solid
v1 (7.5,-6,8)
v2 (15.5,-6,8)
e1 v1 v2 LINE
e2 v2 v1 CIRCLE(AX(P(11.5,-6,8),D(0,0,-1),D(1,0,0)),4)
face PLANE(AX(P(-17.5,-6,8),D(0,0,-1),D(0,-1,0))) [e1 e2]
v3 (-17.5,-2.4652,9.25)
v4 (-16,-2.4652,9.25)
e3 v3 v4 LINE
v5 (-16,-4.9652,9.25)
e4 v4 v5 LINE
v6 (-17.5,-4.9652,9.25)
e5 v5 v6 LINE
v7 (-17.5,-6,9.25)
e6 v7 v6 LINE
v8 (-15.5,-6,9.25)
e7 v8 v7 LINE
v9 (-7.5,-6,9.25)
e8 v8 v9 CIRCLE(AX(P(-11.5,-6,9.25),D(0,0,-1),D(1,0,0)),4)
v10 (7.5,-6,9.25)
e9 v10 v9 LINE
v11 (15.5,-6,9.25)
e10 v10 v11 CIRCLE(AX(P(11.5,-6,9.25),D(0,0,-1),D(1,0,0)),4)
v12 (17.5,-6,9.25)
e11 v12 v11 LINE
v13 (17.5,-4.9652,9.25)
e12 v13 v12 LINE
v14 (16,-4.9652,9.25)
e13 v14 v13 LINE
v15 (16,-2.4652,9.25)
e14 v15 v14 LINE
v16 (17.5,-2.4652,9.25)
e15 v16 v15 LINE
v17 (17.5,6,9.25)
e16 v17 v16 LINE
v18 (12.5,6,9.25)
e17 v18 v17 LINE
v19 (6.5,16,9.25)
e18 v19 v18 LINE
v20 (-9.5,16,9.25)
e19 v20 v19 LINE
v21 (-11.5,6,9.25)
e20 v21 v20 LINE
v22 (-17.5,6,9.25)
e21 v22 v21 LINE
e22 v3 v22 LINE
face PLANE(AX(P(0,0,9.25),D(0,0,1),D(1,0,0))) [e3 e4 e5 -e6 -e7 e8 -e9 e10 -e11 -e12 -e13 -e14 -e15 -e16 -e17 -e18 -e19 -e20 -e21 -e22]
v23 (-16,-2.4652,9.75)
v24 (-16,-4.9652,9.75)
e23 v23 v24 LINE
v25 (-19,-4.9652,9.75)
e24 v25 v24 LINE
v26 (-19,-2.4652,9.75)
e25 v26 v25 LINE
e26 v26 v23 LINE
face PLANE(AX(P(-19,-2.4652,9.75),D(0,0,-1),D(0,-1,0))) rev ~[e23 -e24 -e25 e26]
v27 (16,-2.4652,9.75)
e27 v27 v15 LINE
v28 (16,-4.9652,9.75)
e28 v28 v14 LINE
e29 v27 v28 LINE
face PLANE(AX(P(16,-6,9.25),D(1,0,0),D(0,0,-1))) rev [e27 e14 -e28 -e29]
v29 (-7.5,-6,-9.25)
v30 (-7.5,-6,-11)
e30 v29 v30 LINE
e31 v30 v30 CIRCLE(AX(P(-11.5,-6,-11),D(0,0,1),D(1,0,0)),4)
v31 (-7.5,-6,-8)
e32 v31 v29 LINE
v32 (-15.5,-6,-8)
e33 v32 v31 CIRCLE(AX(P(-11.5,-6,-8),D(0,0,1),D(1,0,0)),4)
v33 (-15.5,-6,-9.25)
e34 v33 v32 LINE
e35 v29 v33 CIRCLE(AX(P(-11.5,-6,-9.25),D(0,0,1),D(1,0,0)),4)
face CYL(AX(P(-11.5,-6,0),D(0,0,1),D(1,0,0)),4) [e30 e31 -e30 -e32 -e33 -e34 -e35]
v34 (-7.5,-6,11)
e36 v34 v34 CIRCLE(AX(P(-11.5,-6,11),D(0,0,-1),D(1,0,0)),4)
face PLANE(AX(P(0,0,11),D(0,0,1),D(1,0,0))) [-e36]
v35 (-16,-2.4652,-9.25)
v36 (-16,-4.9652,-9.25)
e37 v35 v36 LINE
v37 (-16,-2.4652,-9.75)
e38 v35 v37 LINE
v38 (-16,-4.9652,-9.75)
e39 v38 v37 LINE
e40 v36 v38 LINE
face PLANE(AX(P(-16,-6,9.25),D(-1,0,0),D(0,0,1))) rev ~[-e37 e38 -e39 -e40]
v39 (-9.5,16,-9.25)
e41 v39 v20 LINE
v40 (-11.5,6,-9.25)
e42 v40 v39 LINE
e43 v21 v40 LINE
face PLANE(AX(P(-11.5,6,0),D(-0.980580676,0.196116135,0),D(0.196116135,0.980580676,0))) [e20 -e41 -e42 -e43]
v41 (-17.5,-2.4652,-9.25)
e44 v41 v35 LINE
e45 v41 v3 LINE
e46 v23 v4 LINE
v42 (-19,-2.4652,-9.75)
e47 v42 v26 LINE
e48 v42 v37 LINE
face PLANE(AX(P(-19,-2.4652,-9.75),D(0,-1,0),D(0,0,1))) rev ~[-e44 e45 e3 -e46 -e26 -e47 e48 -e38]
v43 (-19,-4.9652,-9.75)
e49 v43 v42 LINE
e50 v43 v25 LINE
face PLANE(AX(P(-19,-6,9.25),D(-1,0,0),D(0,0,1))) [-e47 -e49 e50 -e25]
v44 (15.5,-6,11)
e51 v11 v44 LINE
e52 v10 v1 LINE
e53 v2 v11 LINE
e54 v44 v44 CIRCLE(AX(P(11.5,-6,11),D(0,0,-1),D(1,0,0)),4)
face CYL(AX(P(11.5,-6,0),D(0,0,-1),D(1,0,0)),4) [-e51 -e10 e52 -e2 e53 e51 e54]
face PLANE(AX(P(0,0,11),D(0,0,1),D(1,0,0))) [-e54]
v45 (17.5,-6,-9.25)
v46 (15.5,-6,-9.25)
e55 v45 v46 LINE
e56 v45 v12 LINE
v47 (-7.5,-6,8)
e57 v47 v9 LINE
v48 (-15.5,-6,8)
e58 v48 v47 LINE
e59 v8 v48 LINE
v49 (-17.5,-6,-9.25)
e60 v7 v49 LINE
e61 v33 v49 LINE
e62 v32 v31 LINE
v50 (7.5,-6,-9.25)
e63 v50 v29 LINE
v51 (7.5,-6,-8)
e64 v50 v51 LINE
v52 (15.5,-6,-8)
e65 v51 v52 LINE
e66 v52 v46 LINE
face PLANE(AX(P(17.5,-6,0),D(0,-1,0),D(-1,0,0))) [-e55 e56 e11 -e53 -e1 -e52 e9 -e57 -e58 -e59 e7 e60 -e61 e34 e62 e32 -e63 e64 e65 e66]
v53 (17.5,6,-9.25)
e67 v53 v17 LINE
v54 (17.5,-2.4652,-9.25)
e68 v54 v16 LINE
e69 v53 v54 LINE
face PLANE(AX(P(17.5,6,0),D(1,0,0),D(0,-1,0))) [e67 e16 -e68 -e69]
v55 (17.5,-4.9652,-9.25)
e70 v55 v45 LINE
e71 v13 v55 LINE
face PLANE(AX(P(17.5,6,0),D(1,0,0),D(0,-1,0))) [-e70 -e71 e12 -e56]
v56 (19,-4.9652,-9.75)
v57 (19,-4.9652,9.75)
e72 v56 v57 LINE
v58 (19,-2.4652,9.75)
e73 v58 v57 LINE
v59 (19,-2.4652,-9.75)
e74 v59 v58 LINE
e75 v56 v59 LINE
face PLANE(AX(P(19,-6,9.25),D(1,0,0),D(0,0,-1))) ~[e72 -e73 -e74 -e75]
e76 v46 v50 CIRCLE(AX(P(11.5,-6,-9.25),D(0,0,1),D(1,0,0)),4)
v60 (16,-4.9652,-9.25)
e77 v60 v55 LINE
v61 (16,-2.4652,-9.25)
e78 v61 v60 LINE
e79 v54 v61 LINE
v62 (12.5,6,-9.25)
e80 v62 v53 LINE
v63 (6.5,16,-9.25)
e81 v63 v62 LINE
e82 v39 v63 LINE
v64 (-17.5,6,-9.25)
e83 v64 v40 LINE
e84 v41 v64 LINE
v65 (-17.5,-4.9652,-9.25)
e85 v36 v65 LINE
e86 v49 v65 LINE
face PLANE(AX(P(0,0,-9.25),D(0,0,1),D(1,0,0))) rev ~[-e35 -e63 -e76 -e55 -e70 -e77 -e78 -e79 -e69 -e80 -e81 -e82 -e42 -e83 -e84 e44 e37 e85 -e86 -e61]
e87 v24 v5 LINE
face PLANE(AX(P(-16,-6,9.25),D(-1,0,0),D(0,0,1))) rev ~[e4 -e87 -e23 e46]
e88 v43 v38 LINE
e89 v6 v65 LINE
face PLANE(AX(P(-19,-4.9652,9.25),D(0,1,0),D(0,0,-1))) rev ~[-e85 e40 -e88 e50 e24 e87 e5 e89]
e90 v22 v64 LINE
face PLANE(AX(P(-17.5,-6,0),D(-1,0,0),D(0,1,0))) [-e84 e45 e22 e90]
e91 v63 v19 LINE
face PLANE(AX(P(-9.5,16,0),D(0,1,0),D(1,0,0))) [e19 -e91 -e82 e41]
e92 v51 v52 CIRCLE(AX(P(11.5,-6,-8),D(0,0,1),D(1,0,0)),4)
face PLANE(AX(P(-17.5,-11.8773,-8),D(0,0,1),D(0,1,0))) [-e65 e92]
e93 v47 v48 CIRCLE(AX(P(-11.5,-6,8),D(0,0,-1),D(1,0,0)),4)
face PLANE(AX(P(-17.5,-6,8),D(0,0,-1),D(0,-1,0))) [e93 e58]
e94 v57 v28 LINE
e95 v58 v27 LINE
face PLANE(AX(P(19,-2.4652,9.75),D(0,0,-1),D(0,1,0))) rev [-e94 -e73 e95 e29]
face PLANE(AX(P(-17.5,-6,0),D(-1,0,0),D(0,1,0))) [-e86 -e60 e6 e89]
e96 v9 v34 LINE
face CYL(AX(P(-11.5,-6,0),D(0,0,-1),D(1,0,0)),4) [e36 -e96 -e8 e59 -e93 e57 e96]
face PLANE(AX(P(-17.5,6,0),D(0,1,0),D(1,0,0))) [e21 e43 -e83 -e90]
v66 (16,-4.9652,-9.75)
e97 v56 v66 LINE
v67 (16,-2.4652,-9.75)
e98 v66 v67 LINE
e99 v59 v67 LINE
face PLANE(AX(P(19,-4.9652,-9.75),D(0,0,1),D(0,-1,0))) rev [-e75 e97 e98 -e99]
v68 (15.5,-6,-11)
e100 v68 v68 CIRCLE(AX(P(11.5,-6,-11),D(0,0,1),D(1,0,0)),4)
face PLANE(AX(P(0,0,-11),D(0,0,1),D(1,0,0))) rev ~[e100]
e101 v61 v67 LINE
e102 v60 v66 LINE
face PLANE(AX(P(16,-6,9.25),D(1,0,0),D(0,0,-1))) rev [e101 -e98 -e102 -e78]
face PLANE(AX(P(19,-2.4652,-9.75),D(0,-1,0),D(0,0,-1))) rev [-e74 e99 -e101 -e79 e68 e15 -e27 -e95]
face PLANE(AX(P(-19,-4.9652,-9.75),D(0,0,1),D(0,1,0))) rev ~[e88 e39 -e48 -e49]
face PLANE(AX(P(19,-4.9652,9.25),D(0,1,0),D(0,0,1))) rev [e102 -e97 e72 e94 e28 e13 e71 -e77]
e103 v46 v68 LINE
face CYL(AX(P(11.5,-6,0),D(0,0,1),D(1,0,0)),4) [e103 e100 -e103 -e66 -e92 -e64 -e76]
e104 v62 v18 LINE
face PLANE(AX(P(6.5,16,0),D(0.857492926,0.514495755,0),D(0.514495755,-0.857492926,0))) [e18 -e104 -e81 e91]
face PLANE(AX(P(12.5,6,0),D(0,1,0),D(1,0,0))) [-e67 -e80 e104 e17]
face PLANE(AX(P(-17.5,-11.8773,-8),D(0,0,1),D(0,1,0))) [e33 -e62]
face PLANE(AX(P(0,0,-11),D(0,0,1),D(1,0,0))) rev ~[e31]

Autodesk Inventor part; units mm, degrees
ref_plane "YZ Plane" through (0, 0, 0) normal (1, 0, 0) x (0, 1, 0)
sketch "Sketch1" plane through (0, 0, 0) normal (0, 0, 1) x (1, 0, 0)
  line L0 (17.5, -6) -> (-17.5, -6)
  line L1 (-17.5, -6) -> (-17.5, 6)
  line L2 (-17.5, 6) -> (17.5, 6)
  line L3 (17.5, 6) -> (17.5, -6)
  line L4 (17.5, -6) -> (-17.5, 6) construction
  line L5 (-17.5, -6) -> (17.5, 6) construction
  line L6 (-11.5, 6) -> (-9.5, 16)
  line L7 (-9.5, 16) -> (6.5, 16)
  line L8 (6.5, 16) -> (12.5, 6)
  point P0 (0, 0)
  dimension "d0" = 35
  dimension "d1" = 12
  dimension "d2" = 16
  dimension "d3" = 6
  dimension "d4" = 5
  dimension "d5" = 11
  dimension "d6" = 16
extrude "Extrusion1" add sketch "Sketch1" along normal mid plane 18.5
sketch "Sketch2" plane through (0, 0, 0) normal (0, 0, 1) x (1, 0, 0)
  line L0 (17.5, -6) -> (-17.5, -6) projected
  circle A0 centre (-11.5, -6) radius 4
  circle A1 centre (11.5, -6) radius 4
  line L1 (17.5, -6) -> (17.5, 6) projected
  point P0 (0, 0)
  dimension "d9" = 8
  dimension "d10" = 8
  dimension "d11" = 6
  dimension "d12" = 23
extrude "Extrusion2" add sketch "Sketch2" along normal mid plane 22
sketch "Sketch3" plane through (-17.5, -6, 9.25) normal (-1, 0, 0) x (0, 0, 1)
  line L0 (-17.25, 0) -> (-1.25, 0)
  line L1 (-1.25, 0) -> (-1.25, -5.8773)
  line L2 (-1.25, -5.8773) -> (-17.25, -5.8773)
  line L3 (-17.25, -5.8773) -> (-17.25, 0)
  line L4 (1.75, -4) -> (1.75, 4) projected
  line L5 (0, 0) -> (-18.5, 0) projected
  point P0 (-9.25, 6)
  dimension "d15" = 16
  dimension "d16" = 3
extrude "Extrusion3" cut sketch "Sketch3" against normal blind 35
ref_plane "Work Plane1" through (-19, -6, 9.25) normal (-1, 0, 0) x (0, 0, 1)
sketch "Sketch4" plane through (-19, -6, 9.25) normal (-1, 0, 0) x (0, 0, 1)
  line L0 (-19, 3.5348) -> (0.5, 3.5348)
  line L1 (0.5, 3.5348) -> (0.5, 1.0348)
  line L2 (0.5, 1.0348) -> (-19, 1.0348)
  line L3 (-19, 1.0348) -> (-19, 3.5348)
  line L4 (0, 12) -> (0, 0) projected
  point P0 (-9.25, 6)
  dimension "d20" = 2.5
  dimension "d21" = 19.5
  dimension "d22" = 0.5
extrude "Extrusion4" add sketch "Sketch4" against normal blind 3
mirror "Mirror1" about plane through (0, 0, 0) normal (1, 0, 0) of "Extrusion4"
ref_plane "Work Plane3" through (5.5, 6, 9.25) normal (1, 0, 0) x (0, 0, -1)
sketch "Sketch5" plane through (5.5, 6, 9.25) normal (1, 0, 0) x (0, 0, -1)
  line L0 (1.25, -16) -> (-1.75, -16) projected
  line L1 (20.25, -16) -> (17.25, -16) projected
  circle A0 centre (9.25, -16) radius 2.5
  point P0 (9.25, -6)
  dimension "d26" = 5
boundary_patch "Boundary Patch1"
properties part number "Car"
